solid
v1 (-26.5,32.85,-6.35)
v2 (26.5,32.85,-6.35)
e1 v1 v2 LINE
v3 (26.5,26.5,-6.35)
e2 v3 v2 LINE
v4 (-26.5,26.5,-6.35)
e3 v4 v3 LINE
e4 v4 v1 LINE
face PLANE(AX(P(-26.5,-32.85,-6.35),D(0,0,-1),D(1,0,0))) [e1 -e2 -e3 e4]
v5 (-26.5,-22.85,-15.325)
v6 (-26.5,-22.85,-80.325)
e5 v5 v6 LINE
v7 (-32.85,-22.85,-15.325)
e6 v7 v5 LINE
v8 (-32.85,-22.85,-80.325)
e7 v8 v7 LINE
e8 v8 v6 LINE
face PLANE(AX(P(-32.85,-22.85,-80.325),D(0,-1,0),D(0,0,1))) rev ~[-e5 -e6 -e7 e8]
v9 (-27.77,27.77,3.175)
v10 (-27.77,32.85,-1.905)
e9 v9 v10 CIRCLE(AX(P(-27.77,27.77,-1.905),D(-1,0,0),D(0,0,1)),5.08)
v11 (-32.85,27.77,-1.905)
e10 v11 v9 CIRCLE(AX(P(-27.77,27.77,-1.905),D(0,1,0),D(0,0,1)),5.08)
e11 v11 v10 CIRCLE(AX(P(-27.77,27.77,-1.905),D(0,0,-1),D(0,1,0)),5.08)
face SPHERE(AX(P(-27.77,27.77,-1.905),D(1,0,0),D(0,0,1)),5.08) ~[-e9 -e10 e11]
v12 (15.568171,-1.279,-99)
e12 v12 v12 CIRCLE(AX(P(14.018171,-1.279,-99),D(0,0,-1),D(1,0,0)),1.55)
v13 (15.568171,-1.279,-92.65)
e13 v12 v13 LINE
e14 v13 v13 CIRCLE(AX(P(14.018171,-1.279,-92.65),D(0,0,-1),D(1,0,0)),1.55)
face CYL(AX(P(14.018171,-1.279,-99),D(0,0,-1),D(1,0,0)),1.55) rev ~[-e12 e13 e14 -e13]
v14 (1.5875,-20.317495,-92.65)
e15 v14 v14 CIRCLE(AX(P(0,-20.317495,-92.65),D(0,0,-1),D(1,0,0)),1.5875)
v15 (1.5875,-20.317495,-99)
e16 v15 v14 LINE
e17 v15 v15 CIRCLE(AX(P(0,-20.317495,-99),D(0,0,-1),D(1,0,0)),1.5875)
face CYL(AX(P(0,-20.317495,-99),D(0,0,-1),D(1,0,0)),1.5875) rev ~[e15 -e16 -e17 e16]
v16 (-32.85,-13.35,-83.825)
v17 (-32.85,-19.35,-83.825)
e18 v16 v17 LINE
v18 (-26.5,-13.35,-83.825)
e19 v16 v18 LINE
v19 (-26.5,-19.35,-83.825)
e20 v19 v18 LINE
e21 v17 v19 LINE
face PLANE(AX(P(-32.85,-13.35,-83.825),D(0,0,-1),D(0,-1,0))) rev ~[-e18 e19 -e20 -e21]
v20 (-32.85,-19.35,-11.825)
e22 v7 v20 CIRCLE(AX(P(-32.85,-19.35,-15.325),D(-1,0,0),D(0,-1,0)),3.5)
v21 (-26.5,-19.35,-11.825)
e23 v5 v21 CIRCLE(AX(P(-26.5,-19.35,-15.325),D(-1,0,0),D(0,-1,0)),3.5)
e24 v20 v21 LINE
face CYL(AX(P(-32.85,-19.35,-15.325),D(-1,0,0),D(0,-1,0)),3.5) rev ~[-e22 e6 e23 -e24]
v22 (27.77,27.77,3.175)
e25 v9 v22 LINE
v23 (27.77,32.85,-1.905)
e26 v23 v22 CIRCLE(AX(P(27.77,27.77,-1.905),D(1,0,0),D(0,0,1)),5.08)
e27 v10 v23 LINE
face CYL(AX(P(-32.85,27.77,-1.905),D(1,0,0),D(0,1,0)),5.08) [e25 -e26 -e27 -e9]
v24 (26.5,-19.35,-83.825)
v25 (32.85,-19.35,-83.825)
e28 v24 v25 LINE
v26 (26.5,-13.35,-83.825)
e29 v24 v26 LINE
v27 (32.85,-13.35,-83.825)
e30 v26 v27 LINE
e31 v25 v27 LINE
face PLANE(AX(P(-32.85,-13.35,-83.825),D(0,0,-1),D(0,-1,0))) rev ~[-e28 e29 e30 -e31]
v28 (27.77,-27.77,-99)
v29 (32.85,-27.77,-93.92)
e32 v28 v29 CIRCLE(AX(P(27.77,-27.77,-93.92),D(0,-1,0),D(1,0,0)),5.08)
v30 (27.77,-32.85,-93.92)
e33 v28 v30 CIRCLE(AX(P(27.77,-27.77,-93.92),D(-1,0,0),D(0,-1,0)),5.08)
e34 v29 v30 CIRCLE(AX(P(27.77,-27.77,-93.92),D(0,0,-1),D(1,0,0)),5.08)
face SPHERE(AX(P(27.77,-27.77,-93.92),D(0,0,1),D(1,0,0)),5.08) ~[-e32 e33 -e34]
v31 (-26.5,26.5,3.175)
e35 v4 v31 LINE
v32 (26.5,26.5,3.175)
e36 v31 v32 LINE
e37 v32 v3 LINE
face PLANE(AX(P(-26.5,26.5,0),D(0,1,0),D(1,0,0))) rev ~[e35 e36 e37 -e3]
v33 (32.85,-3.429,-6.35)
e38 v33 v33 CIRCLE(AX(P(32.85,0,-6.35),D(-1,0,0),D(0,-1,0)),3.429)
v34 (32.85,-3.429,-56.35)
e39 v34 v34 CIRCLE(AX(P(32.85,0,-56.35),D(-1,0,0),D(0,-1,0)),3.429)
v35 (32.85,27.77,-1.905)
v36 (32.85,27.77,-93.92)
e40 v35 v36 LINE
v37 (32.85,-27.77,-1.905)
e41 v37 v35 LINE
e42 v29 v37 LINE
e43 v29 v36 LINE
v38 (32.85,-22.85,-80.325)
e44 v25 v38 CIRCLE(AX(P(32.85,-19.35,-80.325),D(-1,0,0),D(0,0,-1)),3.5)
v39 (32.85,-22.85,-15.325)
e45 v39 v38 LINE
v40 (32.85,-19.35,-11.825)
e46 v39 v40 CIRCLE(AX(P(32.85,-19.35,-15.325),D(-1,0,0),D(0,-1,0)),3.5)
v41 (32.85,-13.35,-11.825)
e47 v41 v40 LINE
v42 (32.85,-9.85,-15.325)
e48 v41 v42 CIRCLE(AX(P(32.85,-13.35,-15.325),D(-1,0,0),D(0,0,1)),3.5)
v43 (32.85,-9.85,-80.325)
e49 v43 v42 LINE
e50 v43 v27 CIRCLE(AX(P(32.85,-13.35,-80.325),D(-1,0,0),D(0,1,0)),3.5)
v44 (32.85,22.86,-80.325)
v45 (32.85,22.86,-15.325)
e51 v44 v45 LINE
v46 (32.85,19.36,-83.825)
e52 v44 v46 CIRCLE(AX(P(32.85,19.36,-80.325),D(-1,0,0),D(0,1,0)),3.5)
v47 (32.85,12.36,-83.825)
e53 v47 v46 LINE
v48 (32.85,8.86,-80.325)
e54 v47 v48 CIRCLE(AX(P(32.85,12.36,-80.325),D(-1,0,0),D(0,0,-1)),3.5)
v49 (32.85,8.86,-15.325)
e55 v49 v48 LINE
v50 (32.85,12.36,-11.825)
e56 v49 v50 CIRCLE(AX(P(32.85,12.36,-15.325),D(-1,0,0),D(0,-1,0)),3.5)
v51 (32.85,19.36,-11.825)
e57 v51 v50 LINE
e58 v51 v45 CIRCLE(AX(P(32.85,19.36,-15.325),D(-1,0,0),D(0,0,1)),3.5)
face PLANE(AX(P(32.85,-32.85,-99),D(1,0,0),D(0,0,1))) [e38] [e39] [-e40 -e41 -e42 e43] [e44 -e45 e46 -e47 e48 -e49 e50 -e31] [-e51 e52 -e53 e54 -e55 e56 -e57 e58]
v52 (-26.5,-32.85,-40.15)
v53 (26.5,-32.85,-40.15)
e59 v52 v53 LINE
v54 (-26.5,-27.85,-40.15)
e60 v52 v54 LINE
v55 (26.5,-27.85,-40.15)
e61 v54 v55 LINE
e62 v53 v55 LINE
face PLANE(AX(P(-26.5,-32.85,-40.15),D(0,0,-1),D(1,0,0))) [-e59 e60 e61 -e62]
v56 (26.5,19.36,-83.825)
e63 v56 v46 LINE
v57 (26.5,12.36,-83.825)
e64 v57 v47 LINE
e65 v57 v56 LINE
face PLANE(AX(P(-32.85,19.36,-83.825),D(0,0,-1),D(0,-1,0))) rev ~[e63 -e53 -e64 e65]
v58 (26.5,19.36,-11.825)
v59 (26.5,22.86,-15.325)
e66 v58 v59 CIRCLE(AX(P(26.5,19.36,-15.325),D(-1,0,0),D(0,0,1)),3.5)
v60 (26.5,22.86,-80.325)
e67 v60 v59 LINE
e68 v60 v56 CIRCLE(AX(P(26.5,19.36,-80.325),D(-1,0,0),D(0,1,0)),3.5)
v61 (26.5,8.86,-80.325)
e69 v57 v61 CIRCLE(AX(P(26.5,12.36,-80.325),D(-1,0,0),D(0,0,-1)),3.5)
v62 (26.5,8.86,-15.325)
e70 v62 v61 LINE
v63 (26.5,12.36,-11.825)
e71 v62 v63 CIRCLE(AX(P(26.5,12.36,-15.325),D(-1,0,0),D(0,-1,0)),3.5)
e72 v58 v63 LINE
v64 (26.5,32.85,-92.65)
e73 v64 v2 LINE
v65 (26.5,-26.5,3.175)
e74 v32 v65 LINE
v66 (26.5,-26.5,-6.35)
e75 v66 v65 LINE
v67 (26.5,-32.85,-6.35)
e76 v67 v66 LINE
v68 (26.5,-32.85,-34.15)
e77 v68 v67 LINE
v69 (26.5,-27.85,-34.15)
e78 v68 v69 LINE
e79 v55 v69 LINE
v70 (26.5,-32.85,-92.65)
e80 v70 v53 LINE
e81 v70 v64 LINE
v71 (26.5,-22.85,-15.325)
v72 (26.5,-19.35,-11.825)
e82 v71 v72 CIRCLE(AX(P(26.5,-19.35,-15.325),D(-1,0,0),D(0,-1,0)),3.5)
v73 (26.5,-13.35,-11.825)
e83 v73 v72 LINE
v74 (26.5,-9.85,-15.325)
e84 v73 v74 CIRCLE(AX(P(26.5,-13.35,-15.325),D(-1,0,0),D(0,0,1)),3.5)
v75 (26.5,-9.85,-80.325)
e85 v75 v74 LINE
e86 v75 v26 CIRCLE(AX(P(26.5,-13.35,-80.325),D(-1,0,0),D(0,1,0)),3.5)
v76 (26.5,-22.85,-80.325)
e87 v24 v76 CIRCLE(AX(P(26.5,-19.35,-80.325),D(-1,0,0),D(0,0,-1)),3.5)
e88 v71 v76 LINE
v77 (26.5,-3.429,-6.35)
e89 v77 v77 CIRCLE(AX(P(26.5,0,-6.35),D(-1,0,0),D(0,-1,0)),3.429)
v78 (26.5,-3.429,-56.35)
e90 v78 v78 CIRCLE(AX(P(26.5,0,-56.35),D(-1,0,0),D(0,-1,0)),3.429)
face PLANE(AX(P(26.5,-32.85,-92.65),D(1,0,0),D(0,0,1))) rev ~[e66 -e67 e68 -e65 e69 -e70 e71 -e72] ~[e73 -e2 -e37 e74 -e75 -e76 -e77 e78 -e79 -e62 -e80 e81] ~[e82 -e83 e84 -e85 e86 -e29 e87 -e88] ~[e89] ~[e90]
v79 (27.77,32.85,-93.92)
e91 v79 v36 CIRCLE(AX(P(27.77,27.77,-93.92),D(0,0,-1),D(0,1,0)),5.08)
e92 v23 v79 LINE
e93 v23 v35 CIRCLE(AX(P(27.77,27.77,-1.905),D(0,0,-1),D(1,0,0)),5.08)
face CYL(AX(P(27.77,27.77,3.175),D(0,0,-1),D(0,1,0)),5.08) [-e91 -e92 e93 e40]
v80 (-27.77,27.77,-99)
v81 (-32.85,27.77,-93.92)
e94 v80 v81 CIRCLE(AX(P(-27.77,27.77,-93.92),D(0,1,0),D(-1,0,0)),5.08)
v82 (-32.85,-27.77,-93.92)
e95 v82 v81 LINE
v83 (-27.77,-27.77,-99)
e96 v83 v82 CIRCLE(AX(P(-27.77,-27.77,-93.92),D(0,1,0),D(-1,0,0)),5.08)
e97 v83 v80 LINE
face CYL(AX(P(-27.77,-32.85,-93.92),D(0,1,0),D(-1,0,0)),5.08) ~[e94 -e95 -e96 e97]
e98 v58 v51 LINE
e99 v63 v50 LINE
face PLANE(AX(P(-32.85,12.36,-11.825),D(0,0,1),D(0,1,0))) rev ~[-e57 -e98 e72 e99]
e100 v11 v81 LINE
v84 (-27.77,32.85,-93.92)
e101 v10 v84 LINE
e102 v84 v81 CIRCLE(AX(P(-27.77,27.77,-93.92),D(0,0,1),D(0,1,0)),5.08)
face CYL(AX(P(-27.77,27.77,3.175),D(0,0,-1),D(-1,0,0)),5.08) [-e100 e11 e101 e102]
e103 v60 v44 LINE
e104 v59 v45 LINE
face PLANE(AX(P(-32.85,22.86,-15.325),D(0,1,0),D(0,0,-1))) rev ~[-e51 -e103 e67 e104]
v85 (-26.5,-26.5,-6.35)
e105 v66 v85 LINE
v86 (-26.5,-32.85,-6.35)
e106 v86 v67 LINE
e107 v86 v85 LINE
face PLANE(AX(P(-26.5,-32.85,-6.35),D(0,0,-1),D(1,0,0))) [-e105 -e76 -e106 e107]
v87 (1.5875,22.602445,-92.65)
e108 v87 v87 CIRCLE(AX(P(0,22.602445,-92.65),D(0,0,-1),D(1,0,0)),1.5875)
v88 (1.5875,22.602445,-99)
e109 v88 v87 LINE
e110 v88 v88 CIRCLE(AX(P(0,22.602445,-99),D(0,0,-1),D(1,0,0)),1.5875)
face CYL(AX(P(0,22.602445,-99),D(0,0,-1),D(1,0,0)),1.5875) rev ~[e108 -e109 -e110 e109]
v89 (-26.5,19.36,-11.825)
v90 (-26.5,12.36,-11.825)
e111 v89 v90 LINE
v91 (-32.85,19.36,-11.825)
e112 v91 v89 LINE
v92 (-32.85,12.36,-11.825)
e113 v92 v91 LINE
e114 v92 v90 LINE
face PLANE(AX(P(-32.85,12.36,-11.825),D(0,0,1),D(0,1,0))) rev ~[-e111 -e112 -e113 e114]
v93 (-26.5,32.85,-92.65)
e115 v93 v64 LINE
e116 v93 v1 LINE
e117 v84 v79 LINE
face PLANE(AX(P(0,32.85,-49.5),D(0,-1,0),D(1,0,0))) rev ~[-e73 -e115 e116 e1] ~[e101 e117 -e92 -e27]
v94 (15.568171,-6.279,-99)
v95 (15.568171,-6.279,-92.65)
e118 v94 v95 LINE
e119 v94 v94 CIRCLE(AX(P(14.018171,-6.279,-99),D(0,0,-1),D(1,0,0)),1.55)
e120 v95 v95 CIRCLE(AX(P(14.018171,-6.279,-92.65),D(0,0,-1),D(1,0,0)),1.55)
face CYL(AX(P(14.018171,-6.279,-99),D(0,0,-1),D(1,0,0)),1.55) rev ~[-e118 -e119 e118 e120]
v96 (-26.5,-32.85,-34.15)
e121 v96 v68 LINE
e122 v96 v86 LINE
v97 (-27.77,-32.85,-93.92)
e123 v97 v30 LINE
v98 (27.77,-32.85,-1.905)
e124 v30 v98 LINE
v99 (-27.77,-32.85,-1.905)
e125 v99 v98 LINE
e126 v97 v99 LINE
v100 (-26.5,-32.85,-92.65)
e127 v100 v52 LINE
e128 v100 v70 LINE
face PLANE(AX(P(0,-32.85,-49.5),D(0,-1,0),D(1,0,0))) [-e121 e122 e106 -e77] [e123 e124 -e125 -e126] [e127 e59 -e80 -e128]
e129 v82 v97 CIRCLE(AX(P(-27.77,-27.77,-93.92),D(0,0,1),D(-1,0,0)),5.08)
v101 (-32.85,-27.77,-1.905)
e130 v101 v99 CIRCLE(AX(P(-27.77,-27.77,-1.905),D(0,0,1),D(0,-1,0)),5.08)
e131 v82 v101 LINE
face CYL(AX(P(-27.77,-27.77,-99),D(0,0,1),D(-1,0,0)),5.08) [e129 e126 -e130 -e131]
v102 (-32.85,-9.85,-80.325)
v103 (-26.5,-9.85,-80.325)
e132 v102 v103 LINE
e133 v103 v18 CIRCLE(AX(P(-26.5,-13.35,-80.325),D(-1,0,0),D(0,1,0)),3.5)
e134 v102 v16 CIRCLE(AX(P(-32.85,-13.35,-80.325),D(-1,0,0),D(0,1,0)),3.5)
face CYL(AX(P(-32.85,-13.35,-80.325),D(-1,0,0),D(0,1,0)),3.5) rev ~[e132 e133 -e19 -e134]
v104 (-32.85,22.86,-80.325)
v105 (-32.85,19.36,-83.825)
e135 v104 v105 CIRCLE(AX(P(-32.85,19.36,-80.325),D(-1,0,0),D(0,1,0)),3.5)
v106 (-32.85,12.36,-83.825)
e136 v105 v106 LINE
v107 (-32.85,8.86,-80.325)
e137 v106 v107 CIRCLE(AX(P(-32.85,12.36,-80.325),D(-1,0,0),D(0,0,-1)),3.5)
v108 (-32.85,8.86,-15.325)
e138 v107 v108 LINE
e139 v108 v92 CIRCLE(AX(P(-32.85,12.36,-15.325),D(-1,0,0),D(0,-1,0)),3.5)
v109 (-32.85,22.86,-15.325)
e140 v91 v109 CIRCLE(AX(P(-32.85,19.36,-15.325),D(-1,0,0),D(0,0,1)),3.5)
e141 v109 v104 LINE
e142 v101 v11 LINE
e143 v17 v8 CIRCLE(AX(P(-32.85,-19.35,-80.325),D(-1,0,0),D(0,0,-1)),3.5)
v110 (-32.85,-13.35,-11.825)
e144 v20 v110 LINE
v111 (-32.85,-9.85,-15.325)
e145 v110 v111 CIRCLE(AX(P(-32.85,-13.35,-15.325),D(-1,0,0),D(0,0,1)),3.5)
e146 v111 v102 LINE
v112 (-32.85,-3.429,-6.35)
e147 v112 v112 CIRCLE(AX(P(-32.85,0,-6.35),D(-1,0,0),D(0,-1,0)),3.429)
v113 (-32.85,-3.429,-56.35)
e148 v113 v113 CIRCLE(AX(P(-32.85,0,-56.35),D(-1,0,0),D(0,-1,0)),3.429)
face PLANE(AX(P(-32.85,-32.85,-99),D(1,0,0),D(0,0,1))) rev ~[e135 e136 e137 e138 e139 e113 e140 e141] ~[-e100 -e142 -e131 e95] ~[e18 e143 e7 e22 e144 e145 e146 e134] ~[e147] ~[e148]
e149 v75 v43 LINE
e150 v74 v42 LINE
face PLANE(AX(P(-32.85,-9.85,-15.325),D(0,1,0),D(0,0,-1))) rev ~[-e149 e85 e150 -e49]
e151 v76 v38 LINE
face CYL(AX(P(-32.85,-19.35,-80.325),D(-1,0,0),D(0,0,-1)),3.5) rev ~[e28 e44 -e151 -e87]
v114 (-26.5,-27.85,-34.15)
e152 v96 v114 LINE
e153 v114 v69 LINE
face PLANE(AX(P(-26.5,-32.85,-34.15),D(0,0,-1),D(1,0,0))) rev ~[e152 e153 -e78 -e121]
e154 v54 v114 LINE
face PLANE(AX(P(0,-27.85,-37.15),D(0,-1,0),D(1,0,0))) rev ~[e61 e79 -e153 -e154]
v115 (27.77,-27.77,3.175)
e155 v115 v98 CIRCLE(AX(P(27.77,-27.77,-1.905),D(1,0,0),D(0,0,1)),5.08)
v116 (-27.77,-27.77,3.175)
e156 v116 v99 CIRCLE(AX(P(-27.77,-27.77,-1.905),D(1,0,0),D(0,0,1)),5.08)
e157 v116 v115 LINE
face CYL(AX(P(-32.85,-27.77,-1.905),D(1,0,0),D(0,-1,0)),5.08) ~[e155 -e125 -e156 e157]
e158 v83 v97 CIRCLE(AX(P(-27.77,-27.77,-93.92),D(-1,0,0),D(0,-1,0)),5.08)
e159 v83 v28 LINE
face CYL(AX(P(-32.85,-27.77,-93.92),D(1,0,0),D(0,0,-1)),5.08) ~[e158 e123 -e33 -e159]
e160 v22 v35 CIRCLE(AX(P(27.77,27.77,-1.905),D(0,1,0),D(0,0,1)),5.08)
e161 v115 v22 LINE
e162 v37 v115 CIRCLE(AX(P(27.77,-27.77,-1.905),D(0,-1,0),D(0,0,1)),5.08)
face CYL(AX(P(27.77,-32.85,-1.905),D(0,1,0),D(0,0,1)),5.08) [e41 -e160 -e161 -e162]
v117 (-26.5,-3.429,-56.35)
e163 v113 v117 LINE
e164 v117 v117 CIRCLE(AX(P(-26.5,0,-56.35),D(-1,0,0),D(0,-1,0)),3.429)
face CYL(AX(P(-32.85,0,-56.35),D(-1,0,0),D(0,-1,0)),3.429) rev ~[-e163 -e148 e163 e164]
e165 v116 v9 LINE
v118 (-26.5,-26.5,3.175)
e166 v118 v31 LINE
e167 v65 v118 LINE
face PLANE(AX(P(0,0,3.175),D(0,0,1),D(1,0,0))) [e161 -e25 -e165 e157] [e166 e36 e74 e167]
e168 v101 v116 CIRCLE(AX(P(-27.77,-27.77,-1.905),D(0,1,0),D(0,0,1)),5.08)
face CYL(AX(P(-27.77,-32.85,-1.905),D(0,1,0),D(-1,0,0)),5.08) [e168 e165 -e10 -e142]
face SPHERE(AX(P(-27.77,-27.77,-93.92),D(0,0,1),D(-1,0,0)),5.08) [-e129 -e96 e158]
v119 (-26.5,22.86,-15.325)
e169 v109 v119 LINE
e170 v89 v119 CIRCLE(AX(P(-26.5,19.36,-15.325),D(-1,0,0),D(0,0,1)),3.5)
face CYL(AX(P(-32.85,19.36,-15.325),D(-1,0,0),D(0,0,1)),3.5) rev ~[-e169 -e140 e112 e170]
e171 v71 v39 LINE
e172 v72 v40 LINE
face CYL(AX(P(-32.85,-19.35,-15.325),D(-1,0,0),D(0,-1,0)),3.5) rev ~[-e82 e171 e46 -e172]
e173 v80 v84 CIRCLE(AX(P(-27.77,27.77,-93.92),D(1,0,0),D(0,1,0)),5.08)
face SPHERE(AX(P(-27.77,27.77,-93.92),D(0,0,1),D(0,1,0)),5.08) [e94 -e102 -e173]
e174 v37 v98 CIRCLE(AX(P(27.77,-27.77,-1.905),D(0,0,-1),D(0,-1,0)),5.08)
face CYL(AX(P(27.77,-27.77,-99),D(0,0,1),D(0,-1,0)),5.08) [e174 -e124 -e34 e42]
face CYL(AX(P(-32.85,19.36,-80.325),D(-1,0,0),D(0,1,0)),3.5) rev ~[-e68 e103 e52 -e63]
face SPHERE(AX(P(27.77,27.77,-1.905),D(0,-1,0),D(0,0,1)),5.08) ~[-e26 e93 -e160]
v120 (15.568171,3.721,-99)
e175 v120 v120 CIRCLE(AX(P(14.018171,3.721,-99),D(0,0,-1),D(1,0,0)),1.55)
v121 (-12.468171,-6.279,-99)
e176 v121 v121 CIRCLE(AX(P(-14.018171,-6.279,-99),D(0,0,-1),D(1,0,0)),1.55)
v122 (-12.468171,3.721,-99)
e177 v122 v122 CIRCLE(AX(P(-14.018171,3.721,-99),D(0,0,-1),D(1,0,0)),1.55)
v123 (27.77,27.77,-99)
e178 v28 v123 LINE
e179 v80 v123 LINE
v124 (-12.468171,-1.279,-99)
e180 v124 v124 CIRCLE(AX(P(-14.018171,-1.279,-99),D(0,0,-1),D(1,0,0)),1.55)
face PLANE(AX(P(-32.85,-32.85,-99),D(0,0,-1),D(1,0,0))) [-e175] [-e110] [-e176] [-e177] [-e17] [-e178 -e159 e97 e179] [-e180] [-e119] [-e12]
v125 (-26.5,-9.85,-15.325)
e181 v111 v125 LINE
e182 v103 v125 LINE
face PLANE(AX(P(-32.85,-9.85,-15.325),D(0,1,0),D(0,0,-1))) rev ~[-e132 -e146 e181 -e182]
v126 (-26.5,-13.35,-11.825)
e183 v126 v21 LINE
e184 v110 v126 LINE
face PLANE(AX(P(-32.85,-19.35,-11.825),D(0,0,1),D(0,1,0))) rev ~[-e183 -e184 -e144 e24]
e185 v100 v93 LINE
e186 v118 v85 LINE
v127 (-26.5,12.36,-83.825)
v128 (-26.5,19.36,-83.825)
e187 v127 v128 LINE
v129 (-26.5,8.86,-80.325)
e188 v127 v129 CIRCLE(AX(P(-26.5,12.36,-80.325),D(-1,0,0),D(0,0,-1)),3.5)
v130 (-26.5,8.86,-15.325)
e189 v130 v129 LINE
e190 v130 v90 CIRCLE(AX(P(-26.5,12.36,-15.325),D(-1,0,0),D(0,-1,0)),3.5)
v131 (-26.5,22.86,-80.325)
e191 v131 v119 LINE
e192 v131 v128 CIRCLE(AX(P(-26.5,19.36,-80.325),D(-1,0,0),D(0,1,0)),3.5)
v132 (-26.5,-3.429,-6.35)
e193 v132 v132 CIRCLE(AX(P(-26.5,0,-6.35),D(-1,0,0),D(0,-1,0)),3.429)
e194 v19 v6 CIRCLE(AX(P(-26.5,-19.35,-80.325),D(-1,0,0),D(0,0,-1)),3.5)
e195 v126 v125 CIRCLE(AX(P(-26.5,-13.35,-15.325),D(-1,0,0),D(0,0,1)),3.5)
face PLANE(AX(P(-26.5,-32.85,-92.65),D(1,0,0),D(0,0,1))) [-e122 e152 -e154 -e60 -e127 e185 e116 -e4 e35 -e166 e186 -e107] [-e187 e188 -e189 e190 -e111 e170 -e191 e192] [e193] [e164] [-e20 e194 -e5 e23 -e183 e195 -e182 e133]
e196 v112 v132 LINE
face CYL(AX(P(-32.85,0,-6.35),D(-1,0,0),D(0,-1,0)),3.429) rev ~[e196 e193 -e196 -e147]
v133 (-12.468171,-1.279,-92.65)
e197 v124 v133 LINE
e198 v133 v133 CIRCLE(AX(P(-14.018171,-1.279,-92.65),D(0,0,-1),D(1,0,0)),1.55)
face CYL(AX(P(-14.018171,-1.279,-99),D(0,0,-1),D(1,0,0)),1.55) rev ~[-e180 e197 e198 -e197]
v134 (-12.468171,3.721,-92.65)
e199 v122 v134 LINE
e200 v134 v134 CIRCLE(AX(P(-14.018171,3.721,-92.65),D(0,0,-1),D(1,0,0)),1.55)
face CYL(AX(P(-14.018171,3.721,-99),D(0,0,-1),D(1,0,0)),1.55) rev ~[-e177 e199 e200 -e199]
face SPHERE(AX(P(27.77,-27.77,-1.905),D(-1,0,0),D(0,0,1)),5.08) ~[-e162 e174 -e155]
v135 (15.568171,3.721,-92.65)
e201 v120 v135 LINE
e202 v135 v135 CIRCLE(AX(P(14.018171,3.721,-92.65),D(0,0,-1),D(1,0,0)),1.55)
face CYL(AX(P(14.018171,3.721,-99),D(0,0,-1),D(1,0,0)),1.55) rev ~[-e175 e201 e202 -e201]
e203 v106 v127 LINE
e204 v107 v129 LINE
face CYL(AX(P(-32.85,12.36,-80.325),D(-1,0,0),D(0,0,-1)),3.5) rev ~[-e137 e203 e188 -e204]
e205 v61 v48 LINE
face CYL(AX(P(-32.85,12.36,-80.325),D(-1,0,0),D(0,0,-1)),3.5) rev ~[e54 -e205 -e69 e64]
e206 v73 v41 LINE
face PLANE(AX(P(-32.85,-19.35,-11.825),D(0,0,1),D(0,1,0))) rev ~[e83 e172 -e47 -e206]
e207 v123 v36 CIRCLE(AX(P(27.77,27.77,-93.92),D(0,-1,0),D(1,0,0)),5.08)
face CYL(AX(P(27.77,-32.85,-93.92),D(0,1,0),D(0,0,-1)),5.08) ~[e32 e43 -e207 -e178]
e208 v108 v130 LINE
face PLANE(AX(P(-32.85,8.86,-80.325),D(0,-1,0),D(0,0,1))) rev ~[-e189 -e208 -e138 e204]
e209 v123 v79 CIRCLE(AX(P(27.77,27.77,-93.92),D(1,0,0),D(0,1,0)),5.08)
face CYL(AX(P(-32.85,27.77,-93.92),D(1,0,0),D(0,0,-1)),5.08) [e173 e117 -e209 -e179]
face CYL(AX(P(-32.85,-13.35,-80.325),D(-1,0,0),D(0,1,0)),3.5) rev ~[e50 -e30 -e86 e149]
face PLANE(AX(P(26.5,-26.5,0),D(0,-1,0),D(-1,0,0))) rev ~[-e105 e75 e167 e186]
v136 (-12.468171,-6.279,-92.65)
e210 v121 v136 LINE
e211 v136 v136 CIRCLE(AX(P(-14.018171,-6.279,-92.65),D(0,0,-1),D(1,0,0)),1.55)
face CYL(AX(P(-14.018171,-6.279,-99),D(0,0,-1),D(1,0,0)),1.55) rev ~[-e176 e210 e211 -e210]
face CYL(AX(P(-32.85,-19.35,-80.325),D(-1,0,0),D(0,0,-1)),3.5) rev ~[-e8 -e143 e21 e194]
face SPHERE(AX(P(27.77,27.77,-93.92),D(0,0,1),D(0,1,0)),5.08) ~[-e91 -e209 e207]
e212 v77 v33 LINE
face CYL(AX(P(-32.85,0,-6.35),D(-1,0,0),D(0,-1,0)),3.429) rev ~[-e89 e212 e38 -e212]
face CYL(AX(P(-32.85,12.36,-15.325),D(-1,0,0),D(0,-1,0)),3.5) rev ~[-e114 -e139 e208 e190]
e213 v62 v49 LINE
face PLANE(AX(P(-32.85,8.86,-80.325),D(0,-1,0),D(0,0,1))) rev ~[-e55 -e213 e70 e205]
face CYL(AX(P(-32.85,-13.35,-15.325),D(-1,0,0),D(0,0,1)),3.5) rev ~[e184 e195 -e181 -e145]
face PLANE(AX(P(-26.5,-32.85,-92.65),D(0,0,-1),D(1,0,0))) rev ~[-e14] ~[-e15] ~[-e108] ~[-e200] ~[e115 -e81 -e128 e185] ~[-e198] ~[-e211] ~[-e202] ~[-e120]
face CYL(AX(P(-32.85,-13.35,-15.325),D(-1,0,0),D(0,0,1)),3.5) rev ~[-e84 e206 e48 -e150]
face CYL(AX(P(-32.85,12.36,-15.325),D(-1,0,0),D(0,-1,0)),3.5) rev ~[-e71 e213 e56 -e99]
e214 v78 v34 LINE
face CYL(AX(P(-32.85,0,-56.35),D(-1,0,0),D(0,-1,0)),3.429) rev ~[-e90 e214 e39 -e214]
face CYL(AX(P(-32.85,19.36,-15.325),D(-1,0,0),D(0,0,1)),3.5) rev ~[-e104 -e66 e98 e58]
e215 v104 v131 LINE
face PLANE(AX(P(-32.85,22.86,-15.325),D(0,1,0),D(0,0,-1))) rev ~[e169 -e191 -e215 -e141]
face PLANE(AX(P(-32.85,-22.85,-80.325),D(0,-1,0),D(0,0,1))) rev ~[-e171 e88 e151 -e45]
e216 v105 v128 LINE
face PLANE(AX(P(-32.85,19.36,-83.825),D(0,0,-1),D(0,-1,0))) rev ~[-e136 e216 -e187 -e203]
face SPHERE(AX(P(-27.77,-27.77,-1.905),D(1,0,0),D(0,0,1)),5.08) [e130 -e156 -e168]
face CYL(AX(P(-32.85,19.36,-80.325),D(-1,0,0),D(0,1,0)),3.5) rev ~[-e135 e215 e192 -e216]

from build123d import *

# Parameters (mm, degrees)
F0_W      = 65.7
F0_H      = 65.7
F1_DEPTH  = 3.175
F2_W      = 65.7
F2_H      = 99
F2_W_2    = 53
F2_H_2    = 86.3
F3_DEPTH  = 65.7
F4_DEPTH  = 6.35
F5_R      = 3.429
F6_DEPTH  = 65.701
F7_R      = 5.08
F8_W      = 53
F8_H      = 6
F9_DEPTH  = 5
F10_R     = 1.5875
F10_R_2   = 1.55
F11_DEPTH = 10


# Not quite as in the source:
# - a length typed as a fraction of an inch, garbled in the dataset ("3 / 203.2 mm" for 3/8 in), is restored


with BuildPart() as f1:
    # F0 (on Top) → F1 (new body)
    with BuildSketch(Plane.XY):
        Rectangle(F0_W, F0_H)
        Polygon((26.5, 26.5), (26.5, -26.5), (-26.5, -26.5), (-26.5, -24.0082931455), (-26.5, 26.5), align=None, mode=Mode.SUBTRACT)
    extrude(amount=F1_DEPTH)

    # F2 (on face) → F3 (join)
    with BuildSketch(Plane.XZ.offset(32.85)):
        with Locations((0, -49.5)):
            Rectangle(F2_W, F2_H)
        with Locations((0, -49.5)):
            Rectangle(F2_W_2, F2_H_2, mode=Mode.SUBTRACT)
    extrude(amount=-F3_DEPTH)

    # F4 (cut): faces of the model
    f4_faces = [f1.faces().sort_by_distance(p)[0] for p in [
        (0, 0, 0),
        (0, 0, 0),
    ]]
    extrude(f4_faces, amount=-F4_DEPTH, mode=Mode.SUBTRACT)

    # F5 (on face) → F6 (cut, through all)
    with BuildSketch(Plane(origin=(-32.85, 0, 0), x_dir=(0, -1, 0), z_dir=(-1, 0, 0))):
        with Locations((0, -56.35)):
            Circle(F5_R)
        with Locations((0, -6.35)):
            Circle(F5_R)
        with BuildLine():
            ThreePointArc((22.85, -15.325), (21.8248737342, -12.8501262658), (19.35, -11.825))
            Line((19.35, -11.825), (13.35, -11.825))
            ThreePointArc((13.35, -11.825), (10.8751262658, -12.8501262658), (9.85, -15.325))
            Line((9.85, -15.325), (9.85, -80.325))
            ThreePointArc((9.85, -80.325), (10.8751262658, -82.7998737342), (13.35, -83.825))
            Line((13.35, -83.825), (19.35, -83.825))
            ThreePointArc((19.35, -83.825), (21.8248737342, -82.7998737342), (22.85, -80.325))
            Line((22.85, -80.325), (22.85, -15.325))
        make_face()
        with BuildLine():
            ThreePointArc((-8.86, -15.325), (-9.8851262658, -12.8501262658), (-12.36, -11.825))
            Line((-12.36, -11.825), (-19.36, -11.825))
            ThreePointArc((-19.36, -11.825), (-21.8348737342, -12.8501262658), (-22.86, -15.325))
            Line((-22.86, -15.325), (-22.86, -80.325))
            ThreePointArc((-22.86, -80.325), (-21.8348737342, -82.7998737342), (-19.36, -83.825))
            Line((-19.36, -83.825), (-12.36, -83.825))
            ThreePointArc((-12.36, -83.825), (-9.8851262658, -82.7998737342), (-8.86, -80.325))
            Line((-8.86, -80.325), (-8.86, -15.325))
        make_face()
    extrude(amount=-F6_DEPTH, mode=Mode.SUBTRACT)

    # F7
    f7_edges = [f1.edges().sort_by_distance(p)[0] for p in [
        (0, -32.85, 3.175),
        (32.85, 0, 3.175),
        (0, 32.85, 3.175),
        (-32.85, 0, 3.175),
        (32.85, 32.85, -47.9125),
        (32.85, -32.85, -47.9125),
        (-32.85, -32.85, -47.9125),
        (-32.85, 32.85, -47.9125),
        (0, 32.85, -99),
        (-32.85, 0, -99),
        (32.85, 0, -99),
        (0, -32.85, -99),
    ]]
    fillet(f7_edges, radius=F7_R)

    # F8 (on face) → F9 (join)
    with BuildSketch(Plane.XZ.offset(32.85)):
        with Locations((0, -37.15)):
            Rectangle(F8_W, F8_H)
    extrude(amount=-F9_DEPTH)

    # F10 (on face) → F11 (cut)
    with BuildSketch(Plane(origin=(0, 0, -99), x_dir=(1, 0, 0), z_dir=(0, 0, -1))):
        with Locations((0, 20.3174948692)):
            Circle(F10_R)
        with Locations((-14.0181705356, 1.279)):
            Circle(F10_R_2)
        with Locations((14.0181705356, 1.279)):
            Circle(F10_R_2)
        with Locations((-14.0181705356, 6.279)):
            Circle(F10_R_2)
        with Locations((-14.0181705356, -3.721)):
            Circle(F10_R_2)
        with Locations((14.0181705356, 6.279)):
            Circle(F10_R_2)
        with Locations((14.0181705356, -3.721)):
            Circle(F10_R_2)
        with Locations((0, -22.6024445146)):
            Circle(F10_R)
    extrude(amount=-F11_DEPTH, mode=Mode.SUBTRACT)


solid = f1.part
